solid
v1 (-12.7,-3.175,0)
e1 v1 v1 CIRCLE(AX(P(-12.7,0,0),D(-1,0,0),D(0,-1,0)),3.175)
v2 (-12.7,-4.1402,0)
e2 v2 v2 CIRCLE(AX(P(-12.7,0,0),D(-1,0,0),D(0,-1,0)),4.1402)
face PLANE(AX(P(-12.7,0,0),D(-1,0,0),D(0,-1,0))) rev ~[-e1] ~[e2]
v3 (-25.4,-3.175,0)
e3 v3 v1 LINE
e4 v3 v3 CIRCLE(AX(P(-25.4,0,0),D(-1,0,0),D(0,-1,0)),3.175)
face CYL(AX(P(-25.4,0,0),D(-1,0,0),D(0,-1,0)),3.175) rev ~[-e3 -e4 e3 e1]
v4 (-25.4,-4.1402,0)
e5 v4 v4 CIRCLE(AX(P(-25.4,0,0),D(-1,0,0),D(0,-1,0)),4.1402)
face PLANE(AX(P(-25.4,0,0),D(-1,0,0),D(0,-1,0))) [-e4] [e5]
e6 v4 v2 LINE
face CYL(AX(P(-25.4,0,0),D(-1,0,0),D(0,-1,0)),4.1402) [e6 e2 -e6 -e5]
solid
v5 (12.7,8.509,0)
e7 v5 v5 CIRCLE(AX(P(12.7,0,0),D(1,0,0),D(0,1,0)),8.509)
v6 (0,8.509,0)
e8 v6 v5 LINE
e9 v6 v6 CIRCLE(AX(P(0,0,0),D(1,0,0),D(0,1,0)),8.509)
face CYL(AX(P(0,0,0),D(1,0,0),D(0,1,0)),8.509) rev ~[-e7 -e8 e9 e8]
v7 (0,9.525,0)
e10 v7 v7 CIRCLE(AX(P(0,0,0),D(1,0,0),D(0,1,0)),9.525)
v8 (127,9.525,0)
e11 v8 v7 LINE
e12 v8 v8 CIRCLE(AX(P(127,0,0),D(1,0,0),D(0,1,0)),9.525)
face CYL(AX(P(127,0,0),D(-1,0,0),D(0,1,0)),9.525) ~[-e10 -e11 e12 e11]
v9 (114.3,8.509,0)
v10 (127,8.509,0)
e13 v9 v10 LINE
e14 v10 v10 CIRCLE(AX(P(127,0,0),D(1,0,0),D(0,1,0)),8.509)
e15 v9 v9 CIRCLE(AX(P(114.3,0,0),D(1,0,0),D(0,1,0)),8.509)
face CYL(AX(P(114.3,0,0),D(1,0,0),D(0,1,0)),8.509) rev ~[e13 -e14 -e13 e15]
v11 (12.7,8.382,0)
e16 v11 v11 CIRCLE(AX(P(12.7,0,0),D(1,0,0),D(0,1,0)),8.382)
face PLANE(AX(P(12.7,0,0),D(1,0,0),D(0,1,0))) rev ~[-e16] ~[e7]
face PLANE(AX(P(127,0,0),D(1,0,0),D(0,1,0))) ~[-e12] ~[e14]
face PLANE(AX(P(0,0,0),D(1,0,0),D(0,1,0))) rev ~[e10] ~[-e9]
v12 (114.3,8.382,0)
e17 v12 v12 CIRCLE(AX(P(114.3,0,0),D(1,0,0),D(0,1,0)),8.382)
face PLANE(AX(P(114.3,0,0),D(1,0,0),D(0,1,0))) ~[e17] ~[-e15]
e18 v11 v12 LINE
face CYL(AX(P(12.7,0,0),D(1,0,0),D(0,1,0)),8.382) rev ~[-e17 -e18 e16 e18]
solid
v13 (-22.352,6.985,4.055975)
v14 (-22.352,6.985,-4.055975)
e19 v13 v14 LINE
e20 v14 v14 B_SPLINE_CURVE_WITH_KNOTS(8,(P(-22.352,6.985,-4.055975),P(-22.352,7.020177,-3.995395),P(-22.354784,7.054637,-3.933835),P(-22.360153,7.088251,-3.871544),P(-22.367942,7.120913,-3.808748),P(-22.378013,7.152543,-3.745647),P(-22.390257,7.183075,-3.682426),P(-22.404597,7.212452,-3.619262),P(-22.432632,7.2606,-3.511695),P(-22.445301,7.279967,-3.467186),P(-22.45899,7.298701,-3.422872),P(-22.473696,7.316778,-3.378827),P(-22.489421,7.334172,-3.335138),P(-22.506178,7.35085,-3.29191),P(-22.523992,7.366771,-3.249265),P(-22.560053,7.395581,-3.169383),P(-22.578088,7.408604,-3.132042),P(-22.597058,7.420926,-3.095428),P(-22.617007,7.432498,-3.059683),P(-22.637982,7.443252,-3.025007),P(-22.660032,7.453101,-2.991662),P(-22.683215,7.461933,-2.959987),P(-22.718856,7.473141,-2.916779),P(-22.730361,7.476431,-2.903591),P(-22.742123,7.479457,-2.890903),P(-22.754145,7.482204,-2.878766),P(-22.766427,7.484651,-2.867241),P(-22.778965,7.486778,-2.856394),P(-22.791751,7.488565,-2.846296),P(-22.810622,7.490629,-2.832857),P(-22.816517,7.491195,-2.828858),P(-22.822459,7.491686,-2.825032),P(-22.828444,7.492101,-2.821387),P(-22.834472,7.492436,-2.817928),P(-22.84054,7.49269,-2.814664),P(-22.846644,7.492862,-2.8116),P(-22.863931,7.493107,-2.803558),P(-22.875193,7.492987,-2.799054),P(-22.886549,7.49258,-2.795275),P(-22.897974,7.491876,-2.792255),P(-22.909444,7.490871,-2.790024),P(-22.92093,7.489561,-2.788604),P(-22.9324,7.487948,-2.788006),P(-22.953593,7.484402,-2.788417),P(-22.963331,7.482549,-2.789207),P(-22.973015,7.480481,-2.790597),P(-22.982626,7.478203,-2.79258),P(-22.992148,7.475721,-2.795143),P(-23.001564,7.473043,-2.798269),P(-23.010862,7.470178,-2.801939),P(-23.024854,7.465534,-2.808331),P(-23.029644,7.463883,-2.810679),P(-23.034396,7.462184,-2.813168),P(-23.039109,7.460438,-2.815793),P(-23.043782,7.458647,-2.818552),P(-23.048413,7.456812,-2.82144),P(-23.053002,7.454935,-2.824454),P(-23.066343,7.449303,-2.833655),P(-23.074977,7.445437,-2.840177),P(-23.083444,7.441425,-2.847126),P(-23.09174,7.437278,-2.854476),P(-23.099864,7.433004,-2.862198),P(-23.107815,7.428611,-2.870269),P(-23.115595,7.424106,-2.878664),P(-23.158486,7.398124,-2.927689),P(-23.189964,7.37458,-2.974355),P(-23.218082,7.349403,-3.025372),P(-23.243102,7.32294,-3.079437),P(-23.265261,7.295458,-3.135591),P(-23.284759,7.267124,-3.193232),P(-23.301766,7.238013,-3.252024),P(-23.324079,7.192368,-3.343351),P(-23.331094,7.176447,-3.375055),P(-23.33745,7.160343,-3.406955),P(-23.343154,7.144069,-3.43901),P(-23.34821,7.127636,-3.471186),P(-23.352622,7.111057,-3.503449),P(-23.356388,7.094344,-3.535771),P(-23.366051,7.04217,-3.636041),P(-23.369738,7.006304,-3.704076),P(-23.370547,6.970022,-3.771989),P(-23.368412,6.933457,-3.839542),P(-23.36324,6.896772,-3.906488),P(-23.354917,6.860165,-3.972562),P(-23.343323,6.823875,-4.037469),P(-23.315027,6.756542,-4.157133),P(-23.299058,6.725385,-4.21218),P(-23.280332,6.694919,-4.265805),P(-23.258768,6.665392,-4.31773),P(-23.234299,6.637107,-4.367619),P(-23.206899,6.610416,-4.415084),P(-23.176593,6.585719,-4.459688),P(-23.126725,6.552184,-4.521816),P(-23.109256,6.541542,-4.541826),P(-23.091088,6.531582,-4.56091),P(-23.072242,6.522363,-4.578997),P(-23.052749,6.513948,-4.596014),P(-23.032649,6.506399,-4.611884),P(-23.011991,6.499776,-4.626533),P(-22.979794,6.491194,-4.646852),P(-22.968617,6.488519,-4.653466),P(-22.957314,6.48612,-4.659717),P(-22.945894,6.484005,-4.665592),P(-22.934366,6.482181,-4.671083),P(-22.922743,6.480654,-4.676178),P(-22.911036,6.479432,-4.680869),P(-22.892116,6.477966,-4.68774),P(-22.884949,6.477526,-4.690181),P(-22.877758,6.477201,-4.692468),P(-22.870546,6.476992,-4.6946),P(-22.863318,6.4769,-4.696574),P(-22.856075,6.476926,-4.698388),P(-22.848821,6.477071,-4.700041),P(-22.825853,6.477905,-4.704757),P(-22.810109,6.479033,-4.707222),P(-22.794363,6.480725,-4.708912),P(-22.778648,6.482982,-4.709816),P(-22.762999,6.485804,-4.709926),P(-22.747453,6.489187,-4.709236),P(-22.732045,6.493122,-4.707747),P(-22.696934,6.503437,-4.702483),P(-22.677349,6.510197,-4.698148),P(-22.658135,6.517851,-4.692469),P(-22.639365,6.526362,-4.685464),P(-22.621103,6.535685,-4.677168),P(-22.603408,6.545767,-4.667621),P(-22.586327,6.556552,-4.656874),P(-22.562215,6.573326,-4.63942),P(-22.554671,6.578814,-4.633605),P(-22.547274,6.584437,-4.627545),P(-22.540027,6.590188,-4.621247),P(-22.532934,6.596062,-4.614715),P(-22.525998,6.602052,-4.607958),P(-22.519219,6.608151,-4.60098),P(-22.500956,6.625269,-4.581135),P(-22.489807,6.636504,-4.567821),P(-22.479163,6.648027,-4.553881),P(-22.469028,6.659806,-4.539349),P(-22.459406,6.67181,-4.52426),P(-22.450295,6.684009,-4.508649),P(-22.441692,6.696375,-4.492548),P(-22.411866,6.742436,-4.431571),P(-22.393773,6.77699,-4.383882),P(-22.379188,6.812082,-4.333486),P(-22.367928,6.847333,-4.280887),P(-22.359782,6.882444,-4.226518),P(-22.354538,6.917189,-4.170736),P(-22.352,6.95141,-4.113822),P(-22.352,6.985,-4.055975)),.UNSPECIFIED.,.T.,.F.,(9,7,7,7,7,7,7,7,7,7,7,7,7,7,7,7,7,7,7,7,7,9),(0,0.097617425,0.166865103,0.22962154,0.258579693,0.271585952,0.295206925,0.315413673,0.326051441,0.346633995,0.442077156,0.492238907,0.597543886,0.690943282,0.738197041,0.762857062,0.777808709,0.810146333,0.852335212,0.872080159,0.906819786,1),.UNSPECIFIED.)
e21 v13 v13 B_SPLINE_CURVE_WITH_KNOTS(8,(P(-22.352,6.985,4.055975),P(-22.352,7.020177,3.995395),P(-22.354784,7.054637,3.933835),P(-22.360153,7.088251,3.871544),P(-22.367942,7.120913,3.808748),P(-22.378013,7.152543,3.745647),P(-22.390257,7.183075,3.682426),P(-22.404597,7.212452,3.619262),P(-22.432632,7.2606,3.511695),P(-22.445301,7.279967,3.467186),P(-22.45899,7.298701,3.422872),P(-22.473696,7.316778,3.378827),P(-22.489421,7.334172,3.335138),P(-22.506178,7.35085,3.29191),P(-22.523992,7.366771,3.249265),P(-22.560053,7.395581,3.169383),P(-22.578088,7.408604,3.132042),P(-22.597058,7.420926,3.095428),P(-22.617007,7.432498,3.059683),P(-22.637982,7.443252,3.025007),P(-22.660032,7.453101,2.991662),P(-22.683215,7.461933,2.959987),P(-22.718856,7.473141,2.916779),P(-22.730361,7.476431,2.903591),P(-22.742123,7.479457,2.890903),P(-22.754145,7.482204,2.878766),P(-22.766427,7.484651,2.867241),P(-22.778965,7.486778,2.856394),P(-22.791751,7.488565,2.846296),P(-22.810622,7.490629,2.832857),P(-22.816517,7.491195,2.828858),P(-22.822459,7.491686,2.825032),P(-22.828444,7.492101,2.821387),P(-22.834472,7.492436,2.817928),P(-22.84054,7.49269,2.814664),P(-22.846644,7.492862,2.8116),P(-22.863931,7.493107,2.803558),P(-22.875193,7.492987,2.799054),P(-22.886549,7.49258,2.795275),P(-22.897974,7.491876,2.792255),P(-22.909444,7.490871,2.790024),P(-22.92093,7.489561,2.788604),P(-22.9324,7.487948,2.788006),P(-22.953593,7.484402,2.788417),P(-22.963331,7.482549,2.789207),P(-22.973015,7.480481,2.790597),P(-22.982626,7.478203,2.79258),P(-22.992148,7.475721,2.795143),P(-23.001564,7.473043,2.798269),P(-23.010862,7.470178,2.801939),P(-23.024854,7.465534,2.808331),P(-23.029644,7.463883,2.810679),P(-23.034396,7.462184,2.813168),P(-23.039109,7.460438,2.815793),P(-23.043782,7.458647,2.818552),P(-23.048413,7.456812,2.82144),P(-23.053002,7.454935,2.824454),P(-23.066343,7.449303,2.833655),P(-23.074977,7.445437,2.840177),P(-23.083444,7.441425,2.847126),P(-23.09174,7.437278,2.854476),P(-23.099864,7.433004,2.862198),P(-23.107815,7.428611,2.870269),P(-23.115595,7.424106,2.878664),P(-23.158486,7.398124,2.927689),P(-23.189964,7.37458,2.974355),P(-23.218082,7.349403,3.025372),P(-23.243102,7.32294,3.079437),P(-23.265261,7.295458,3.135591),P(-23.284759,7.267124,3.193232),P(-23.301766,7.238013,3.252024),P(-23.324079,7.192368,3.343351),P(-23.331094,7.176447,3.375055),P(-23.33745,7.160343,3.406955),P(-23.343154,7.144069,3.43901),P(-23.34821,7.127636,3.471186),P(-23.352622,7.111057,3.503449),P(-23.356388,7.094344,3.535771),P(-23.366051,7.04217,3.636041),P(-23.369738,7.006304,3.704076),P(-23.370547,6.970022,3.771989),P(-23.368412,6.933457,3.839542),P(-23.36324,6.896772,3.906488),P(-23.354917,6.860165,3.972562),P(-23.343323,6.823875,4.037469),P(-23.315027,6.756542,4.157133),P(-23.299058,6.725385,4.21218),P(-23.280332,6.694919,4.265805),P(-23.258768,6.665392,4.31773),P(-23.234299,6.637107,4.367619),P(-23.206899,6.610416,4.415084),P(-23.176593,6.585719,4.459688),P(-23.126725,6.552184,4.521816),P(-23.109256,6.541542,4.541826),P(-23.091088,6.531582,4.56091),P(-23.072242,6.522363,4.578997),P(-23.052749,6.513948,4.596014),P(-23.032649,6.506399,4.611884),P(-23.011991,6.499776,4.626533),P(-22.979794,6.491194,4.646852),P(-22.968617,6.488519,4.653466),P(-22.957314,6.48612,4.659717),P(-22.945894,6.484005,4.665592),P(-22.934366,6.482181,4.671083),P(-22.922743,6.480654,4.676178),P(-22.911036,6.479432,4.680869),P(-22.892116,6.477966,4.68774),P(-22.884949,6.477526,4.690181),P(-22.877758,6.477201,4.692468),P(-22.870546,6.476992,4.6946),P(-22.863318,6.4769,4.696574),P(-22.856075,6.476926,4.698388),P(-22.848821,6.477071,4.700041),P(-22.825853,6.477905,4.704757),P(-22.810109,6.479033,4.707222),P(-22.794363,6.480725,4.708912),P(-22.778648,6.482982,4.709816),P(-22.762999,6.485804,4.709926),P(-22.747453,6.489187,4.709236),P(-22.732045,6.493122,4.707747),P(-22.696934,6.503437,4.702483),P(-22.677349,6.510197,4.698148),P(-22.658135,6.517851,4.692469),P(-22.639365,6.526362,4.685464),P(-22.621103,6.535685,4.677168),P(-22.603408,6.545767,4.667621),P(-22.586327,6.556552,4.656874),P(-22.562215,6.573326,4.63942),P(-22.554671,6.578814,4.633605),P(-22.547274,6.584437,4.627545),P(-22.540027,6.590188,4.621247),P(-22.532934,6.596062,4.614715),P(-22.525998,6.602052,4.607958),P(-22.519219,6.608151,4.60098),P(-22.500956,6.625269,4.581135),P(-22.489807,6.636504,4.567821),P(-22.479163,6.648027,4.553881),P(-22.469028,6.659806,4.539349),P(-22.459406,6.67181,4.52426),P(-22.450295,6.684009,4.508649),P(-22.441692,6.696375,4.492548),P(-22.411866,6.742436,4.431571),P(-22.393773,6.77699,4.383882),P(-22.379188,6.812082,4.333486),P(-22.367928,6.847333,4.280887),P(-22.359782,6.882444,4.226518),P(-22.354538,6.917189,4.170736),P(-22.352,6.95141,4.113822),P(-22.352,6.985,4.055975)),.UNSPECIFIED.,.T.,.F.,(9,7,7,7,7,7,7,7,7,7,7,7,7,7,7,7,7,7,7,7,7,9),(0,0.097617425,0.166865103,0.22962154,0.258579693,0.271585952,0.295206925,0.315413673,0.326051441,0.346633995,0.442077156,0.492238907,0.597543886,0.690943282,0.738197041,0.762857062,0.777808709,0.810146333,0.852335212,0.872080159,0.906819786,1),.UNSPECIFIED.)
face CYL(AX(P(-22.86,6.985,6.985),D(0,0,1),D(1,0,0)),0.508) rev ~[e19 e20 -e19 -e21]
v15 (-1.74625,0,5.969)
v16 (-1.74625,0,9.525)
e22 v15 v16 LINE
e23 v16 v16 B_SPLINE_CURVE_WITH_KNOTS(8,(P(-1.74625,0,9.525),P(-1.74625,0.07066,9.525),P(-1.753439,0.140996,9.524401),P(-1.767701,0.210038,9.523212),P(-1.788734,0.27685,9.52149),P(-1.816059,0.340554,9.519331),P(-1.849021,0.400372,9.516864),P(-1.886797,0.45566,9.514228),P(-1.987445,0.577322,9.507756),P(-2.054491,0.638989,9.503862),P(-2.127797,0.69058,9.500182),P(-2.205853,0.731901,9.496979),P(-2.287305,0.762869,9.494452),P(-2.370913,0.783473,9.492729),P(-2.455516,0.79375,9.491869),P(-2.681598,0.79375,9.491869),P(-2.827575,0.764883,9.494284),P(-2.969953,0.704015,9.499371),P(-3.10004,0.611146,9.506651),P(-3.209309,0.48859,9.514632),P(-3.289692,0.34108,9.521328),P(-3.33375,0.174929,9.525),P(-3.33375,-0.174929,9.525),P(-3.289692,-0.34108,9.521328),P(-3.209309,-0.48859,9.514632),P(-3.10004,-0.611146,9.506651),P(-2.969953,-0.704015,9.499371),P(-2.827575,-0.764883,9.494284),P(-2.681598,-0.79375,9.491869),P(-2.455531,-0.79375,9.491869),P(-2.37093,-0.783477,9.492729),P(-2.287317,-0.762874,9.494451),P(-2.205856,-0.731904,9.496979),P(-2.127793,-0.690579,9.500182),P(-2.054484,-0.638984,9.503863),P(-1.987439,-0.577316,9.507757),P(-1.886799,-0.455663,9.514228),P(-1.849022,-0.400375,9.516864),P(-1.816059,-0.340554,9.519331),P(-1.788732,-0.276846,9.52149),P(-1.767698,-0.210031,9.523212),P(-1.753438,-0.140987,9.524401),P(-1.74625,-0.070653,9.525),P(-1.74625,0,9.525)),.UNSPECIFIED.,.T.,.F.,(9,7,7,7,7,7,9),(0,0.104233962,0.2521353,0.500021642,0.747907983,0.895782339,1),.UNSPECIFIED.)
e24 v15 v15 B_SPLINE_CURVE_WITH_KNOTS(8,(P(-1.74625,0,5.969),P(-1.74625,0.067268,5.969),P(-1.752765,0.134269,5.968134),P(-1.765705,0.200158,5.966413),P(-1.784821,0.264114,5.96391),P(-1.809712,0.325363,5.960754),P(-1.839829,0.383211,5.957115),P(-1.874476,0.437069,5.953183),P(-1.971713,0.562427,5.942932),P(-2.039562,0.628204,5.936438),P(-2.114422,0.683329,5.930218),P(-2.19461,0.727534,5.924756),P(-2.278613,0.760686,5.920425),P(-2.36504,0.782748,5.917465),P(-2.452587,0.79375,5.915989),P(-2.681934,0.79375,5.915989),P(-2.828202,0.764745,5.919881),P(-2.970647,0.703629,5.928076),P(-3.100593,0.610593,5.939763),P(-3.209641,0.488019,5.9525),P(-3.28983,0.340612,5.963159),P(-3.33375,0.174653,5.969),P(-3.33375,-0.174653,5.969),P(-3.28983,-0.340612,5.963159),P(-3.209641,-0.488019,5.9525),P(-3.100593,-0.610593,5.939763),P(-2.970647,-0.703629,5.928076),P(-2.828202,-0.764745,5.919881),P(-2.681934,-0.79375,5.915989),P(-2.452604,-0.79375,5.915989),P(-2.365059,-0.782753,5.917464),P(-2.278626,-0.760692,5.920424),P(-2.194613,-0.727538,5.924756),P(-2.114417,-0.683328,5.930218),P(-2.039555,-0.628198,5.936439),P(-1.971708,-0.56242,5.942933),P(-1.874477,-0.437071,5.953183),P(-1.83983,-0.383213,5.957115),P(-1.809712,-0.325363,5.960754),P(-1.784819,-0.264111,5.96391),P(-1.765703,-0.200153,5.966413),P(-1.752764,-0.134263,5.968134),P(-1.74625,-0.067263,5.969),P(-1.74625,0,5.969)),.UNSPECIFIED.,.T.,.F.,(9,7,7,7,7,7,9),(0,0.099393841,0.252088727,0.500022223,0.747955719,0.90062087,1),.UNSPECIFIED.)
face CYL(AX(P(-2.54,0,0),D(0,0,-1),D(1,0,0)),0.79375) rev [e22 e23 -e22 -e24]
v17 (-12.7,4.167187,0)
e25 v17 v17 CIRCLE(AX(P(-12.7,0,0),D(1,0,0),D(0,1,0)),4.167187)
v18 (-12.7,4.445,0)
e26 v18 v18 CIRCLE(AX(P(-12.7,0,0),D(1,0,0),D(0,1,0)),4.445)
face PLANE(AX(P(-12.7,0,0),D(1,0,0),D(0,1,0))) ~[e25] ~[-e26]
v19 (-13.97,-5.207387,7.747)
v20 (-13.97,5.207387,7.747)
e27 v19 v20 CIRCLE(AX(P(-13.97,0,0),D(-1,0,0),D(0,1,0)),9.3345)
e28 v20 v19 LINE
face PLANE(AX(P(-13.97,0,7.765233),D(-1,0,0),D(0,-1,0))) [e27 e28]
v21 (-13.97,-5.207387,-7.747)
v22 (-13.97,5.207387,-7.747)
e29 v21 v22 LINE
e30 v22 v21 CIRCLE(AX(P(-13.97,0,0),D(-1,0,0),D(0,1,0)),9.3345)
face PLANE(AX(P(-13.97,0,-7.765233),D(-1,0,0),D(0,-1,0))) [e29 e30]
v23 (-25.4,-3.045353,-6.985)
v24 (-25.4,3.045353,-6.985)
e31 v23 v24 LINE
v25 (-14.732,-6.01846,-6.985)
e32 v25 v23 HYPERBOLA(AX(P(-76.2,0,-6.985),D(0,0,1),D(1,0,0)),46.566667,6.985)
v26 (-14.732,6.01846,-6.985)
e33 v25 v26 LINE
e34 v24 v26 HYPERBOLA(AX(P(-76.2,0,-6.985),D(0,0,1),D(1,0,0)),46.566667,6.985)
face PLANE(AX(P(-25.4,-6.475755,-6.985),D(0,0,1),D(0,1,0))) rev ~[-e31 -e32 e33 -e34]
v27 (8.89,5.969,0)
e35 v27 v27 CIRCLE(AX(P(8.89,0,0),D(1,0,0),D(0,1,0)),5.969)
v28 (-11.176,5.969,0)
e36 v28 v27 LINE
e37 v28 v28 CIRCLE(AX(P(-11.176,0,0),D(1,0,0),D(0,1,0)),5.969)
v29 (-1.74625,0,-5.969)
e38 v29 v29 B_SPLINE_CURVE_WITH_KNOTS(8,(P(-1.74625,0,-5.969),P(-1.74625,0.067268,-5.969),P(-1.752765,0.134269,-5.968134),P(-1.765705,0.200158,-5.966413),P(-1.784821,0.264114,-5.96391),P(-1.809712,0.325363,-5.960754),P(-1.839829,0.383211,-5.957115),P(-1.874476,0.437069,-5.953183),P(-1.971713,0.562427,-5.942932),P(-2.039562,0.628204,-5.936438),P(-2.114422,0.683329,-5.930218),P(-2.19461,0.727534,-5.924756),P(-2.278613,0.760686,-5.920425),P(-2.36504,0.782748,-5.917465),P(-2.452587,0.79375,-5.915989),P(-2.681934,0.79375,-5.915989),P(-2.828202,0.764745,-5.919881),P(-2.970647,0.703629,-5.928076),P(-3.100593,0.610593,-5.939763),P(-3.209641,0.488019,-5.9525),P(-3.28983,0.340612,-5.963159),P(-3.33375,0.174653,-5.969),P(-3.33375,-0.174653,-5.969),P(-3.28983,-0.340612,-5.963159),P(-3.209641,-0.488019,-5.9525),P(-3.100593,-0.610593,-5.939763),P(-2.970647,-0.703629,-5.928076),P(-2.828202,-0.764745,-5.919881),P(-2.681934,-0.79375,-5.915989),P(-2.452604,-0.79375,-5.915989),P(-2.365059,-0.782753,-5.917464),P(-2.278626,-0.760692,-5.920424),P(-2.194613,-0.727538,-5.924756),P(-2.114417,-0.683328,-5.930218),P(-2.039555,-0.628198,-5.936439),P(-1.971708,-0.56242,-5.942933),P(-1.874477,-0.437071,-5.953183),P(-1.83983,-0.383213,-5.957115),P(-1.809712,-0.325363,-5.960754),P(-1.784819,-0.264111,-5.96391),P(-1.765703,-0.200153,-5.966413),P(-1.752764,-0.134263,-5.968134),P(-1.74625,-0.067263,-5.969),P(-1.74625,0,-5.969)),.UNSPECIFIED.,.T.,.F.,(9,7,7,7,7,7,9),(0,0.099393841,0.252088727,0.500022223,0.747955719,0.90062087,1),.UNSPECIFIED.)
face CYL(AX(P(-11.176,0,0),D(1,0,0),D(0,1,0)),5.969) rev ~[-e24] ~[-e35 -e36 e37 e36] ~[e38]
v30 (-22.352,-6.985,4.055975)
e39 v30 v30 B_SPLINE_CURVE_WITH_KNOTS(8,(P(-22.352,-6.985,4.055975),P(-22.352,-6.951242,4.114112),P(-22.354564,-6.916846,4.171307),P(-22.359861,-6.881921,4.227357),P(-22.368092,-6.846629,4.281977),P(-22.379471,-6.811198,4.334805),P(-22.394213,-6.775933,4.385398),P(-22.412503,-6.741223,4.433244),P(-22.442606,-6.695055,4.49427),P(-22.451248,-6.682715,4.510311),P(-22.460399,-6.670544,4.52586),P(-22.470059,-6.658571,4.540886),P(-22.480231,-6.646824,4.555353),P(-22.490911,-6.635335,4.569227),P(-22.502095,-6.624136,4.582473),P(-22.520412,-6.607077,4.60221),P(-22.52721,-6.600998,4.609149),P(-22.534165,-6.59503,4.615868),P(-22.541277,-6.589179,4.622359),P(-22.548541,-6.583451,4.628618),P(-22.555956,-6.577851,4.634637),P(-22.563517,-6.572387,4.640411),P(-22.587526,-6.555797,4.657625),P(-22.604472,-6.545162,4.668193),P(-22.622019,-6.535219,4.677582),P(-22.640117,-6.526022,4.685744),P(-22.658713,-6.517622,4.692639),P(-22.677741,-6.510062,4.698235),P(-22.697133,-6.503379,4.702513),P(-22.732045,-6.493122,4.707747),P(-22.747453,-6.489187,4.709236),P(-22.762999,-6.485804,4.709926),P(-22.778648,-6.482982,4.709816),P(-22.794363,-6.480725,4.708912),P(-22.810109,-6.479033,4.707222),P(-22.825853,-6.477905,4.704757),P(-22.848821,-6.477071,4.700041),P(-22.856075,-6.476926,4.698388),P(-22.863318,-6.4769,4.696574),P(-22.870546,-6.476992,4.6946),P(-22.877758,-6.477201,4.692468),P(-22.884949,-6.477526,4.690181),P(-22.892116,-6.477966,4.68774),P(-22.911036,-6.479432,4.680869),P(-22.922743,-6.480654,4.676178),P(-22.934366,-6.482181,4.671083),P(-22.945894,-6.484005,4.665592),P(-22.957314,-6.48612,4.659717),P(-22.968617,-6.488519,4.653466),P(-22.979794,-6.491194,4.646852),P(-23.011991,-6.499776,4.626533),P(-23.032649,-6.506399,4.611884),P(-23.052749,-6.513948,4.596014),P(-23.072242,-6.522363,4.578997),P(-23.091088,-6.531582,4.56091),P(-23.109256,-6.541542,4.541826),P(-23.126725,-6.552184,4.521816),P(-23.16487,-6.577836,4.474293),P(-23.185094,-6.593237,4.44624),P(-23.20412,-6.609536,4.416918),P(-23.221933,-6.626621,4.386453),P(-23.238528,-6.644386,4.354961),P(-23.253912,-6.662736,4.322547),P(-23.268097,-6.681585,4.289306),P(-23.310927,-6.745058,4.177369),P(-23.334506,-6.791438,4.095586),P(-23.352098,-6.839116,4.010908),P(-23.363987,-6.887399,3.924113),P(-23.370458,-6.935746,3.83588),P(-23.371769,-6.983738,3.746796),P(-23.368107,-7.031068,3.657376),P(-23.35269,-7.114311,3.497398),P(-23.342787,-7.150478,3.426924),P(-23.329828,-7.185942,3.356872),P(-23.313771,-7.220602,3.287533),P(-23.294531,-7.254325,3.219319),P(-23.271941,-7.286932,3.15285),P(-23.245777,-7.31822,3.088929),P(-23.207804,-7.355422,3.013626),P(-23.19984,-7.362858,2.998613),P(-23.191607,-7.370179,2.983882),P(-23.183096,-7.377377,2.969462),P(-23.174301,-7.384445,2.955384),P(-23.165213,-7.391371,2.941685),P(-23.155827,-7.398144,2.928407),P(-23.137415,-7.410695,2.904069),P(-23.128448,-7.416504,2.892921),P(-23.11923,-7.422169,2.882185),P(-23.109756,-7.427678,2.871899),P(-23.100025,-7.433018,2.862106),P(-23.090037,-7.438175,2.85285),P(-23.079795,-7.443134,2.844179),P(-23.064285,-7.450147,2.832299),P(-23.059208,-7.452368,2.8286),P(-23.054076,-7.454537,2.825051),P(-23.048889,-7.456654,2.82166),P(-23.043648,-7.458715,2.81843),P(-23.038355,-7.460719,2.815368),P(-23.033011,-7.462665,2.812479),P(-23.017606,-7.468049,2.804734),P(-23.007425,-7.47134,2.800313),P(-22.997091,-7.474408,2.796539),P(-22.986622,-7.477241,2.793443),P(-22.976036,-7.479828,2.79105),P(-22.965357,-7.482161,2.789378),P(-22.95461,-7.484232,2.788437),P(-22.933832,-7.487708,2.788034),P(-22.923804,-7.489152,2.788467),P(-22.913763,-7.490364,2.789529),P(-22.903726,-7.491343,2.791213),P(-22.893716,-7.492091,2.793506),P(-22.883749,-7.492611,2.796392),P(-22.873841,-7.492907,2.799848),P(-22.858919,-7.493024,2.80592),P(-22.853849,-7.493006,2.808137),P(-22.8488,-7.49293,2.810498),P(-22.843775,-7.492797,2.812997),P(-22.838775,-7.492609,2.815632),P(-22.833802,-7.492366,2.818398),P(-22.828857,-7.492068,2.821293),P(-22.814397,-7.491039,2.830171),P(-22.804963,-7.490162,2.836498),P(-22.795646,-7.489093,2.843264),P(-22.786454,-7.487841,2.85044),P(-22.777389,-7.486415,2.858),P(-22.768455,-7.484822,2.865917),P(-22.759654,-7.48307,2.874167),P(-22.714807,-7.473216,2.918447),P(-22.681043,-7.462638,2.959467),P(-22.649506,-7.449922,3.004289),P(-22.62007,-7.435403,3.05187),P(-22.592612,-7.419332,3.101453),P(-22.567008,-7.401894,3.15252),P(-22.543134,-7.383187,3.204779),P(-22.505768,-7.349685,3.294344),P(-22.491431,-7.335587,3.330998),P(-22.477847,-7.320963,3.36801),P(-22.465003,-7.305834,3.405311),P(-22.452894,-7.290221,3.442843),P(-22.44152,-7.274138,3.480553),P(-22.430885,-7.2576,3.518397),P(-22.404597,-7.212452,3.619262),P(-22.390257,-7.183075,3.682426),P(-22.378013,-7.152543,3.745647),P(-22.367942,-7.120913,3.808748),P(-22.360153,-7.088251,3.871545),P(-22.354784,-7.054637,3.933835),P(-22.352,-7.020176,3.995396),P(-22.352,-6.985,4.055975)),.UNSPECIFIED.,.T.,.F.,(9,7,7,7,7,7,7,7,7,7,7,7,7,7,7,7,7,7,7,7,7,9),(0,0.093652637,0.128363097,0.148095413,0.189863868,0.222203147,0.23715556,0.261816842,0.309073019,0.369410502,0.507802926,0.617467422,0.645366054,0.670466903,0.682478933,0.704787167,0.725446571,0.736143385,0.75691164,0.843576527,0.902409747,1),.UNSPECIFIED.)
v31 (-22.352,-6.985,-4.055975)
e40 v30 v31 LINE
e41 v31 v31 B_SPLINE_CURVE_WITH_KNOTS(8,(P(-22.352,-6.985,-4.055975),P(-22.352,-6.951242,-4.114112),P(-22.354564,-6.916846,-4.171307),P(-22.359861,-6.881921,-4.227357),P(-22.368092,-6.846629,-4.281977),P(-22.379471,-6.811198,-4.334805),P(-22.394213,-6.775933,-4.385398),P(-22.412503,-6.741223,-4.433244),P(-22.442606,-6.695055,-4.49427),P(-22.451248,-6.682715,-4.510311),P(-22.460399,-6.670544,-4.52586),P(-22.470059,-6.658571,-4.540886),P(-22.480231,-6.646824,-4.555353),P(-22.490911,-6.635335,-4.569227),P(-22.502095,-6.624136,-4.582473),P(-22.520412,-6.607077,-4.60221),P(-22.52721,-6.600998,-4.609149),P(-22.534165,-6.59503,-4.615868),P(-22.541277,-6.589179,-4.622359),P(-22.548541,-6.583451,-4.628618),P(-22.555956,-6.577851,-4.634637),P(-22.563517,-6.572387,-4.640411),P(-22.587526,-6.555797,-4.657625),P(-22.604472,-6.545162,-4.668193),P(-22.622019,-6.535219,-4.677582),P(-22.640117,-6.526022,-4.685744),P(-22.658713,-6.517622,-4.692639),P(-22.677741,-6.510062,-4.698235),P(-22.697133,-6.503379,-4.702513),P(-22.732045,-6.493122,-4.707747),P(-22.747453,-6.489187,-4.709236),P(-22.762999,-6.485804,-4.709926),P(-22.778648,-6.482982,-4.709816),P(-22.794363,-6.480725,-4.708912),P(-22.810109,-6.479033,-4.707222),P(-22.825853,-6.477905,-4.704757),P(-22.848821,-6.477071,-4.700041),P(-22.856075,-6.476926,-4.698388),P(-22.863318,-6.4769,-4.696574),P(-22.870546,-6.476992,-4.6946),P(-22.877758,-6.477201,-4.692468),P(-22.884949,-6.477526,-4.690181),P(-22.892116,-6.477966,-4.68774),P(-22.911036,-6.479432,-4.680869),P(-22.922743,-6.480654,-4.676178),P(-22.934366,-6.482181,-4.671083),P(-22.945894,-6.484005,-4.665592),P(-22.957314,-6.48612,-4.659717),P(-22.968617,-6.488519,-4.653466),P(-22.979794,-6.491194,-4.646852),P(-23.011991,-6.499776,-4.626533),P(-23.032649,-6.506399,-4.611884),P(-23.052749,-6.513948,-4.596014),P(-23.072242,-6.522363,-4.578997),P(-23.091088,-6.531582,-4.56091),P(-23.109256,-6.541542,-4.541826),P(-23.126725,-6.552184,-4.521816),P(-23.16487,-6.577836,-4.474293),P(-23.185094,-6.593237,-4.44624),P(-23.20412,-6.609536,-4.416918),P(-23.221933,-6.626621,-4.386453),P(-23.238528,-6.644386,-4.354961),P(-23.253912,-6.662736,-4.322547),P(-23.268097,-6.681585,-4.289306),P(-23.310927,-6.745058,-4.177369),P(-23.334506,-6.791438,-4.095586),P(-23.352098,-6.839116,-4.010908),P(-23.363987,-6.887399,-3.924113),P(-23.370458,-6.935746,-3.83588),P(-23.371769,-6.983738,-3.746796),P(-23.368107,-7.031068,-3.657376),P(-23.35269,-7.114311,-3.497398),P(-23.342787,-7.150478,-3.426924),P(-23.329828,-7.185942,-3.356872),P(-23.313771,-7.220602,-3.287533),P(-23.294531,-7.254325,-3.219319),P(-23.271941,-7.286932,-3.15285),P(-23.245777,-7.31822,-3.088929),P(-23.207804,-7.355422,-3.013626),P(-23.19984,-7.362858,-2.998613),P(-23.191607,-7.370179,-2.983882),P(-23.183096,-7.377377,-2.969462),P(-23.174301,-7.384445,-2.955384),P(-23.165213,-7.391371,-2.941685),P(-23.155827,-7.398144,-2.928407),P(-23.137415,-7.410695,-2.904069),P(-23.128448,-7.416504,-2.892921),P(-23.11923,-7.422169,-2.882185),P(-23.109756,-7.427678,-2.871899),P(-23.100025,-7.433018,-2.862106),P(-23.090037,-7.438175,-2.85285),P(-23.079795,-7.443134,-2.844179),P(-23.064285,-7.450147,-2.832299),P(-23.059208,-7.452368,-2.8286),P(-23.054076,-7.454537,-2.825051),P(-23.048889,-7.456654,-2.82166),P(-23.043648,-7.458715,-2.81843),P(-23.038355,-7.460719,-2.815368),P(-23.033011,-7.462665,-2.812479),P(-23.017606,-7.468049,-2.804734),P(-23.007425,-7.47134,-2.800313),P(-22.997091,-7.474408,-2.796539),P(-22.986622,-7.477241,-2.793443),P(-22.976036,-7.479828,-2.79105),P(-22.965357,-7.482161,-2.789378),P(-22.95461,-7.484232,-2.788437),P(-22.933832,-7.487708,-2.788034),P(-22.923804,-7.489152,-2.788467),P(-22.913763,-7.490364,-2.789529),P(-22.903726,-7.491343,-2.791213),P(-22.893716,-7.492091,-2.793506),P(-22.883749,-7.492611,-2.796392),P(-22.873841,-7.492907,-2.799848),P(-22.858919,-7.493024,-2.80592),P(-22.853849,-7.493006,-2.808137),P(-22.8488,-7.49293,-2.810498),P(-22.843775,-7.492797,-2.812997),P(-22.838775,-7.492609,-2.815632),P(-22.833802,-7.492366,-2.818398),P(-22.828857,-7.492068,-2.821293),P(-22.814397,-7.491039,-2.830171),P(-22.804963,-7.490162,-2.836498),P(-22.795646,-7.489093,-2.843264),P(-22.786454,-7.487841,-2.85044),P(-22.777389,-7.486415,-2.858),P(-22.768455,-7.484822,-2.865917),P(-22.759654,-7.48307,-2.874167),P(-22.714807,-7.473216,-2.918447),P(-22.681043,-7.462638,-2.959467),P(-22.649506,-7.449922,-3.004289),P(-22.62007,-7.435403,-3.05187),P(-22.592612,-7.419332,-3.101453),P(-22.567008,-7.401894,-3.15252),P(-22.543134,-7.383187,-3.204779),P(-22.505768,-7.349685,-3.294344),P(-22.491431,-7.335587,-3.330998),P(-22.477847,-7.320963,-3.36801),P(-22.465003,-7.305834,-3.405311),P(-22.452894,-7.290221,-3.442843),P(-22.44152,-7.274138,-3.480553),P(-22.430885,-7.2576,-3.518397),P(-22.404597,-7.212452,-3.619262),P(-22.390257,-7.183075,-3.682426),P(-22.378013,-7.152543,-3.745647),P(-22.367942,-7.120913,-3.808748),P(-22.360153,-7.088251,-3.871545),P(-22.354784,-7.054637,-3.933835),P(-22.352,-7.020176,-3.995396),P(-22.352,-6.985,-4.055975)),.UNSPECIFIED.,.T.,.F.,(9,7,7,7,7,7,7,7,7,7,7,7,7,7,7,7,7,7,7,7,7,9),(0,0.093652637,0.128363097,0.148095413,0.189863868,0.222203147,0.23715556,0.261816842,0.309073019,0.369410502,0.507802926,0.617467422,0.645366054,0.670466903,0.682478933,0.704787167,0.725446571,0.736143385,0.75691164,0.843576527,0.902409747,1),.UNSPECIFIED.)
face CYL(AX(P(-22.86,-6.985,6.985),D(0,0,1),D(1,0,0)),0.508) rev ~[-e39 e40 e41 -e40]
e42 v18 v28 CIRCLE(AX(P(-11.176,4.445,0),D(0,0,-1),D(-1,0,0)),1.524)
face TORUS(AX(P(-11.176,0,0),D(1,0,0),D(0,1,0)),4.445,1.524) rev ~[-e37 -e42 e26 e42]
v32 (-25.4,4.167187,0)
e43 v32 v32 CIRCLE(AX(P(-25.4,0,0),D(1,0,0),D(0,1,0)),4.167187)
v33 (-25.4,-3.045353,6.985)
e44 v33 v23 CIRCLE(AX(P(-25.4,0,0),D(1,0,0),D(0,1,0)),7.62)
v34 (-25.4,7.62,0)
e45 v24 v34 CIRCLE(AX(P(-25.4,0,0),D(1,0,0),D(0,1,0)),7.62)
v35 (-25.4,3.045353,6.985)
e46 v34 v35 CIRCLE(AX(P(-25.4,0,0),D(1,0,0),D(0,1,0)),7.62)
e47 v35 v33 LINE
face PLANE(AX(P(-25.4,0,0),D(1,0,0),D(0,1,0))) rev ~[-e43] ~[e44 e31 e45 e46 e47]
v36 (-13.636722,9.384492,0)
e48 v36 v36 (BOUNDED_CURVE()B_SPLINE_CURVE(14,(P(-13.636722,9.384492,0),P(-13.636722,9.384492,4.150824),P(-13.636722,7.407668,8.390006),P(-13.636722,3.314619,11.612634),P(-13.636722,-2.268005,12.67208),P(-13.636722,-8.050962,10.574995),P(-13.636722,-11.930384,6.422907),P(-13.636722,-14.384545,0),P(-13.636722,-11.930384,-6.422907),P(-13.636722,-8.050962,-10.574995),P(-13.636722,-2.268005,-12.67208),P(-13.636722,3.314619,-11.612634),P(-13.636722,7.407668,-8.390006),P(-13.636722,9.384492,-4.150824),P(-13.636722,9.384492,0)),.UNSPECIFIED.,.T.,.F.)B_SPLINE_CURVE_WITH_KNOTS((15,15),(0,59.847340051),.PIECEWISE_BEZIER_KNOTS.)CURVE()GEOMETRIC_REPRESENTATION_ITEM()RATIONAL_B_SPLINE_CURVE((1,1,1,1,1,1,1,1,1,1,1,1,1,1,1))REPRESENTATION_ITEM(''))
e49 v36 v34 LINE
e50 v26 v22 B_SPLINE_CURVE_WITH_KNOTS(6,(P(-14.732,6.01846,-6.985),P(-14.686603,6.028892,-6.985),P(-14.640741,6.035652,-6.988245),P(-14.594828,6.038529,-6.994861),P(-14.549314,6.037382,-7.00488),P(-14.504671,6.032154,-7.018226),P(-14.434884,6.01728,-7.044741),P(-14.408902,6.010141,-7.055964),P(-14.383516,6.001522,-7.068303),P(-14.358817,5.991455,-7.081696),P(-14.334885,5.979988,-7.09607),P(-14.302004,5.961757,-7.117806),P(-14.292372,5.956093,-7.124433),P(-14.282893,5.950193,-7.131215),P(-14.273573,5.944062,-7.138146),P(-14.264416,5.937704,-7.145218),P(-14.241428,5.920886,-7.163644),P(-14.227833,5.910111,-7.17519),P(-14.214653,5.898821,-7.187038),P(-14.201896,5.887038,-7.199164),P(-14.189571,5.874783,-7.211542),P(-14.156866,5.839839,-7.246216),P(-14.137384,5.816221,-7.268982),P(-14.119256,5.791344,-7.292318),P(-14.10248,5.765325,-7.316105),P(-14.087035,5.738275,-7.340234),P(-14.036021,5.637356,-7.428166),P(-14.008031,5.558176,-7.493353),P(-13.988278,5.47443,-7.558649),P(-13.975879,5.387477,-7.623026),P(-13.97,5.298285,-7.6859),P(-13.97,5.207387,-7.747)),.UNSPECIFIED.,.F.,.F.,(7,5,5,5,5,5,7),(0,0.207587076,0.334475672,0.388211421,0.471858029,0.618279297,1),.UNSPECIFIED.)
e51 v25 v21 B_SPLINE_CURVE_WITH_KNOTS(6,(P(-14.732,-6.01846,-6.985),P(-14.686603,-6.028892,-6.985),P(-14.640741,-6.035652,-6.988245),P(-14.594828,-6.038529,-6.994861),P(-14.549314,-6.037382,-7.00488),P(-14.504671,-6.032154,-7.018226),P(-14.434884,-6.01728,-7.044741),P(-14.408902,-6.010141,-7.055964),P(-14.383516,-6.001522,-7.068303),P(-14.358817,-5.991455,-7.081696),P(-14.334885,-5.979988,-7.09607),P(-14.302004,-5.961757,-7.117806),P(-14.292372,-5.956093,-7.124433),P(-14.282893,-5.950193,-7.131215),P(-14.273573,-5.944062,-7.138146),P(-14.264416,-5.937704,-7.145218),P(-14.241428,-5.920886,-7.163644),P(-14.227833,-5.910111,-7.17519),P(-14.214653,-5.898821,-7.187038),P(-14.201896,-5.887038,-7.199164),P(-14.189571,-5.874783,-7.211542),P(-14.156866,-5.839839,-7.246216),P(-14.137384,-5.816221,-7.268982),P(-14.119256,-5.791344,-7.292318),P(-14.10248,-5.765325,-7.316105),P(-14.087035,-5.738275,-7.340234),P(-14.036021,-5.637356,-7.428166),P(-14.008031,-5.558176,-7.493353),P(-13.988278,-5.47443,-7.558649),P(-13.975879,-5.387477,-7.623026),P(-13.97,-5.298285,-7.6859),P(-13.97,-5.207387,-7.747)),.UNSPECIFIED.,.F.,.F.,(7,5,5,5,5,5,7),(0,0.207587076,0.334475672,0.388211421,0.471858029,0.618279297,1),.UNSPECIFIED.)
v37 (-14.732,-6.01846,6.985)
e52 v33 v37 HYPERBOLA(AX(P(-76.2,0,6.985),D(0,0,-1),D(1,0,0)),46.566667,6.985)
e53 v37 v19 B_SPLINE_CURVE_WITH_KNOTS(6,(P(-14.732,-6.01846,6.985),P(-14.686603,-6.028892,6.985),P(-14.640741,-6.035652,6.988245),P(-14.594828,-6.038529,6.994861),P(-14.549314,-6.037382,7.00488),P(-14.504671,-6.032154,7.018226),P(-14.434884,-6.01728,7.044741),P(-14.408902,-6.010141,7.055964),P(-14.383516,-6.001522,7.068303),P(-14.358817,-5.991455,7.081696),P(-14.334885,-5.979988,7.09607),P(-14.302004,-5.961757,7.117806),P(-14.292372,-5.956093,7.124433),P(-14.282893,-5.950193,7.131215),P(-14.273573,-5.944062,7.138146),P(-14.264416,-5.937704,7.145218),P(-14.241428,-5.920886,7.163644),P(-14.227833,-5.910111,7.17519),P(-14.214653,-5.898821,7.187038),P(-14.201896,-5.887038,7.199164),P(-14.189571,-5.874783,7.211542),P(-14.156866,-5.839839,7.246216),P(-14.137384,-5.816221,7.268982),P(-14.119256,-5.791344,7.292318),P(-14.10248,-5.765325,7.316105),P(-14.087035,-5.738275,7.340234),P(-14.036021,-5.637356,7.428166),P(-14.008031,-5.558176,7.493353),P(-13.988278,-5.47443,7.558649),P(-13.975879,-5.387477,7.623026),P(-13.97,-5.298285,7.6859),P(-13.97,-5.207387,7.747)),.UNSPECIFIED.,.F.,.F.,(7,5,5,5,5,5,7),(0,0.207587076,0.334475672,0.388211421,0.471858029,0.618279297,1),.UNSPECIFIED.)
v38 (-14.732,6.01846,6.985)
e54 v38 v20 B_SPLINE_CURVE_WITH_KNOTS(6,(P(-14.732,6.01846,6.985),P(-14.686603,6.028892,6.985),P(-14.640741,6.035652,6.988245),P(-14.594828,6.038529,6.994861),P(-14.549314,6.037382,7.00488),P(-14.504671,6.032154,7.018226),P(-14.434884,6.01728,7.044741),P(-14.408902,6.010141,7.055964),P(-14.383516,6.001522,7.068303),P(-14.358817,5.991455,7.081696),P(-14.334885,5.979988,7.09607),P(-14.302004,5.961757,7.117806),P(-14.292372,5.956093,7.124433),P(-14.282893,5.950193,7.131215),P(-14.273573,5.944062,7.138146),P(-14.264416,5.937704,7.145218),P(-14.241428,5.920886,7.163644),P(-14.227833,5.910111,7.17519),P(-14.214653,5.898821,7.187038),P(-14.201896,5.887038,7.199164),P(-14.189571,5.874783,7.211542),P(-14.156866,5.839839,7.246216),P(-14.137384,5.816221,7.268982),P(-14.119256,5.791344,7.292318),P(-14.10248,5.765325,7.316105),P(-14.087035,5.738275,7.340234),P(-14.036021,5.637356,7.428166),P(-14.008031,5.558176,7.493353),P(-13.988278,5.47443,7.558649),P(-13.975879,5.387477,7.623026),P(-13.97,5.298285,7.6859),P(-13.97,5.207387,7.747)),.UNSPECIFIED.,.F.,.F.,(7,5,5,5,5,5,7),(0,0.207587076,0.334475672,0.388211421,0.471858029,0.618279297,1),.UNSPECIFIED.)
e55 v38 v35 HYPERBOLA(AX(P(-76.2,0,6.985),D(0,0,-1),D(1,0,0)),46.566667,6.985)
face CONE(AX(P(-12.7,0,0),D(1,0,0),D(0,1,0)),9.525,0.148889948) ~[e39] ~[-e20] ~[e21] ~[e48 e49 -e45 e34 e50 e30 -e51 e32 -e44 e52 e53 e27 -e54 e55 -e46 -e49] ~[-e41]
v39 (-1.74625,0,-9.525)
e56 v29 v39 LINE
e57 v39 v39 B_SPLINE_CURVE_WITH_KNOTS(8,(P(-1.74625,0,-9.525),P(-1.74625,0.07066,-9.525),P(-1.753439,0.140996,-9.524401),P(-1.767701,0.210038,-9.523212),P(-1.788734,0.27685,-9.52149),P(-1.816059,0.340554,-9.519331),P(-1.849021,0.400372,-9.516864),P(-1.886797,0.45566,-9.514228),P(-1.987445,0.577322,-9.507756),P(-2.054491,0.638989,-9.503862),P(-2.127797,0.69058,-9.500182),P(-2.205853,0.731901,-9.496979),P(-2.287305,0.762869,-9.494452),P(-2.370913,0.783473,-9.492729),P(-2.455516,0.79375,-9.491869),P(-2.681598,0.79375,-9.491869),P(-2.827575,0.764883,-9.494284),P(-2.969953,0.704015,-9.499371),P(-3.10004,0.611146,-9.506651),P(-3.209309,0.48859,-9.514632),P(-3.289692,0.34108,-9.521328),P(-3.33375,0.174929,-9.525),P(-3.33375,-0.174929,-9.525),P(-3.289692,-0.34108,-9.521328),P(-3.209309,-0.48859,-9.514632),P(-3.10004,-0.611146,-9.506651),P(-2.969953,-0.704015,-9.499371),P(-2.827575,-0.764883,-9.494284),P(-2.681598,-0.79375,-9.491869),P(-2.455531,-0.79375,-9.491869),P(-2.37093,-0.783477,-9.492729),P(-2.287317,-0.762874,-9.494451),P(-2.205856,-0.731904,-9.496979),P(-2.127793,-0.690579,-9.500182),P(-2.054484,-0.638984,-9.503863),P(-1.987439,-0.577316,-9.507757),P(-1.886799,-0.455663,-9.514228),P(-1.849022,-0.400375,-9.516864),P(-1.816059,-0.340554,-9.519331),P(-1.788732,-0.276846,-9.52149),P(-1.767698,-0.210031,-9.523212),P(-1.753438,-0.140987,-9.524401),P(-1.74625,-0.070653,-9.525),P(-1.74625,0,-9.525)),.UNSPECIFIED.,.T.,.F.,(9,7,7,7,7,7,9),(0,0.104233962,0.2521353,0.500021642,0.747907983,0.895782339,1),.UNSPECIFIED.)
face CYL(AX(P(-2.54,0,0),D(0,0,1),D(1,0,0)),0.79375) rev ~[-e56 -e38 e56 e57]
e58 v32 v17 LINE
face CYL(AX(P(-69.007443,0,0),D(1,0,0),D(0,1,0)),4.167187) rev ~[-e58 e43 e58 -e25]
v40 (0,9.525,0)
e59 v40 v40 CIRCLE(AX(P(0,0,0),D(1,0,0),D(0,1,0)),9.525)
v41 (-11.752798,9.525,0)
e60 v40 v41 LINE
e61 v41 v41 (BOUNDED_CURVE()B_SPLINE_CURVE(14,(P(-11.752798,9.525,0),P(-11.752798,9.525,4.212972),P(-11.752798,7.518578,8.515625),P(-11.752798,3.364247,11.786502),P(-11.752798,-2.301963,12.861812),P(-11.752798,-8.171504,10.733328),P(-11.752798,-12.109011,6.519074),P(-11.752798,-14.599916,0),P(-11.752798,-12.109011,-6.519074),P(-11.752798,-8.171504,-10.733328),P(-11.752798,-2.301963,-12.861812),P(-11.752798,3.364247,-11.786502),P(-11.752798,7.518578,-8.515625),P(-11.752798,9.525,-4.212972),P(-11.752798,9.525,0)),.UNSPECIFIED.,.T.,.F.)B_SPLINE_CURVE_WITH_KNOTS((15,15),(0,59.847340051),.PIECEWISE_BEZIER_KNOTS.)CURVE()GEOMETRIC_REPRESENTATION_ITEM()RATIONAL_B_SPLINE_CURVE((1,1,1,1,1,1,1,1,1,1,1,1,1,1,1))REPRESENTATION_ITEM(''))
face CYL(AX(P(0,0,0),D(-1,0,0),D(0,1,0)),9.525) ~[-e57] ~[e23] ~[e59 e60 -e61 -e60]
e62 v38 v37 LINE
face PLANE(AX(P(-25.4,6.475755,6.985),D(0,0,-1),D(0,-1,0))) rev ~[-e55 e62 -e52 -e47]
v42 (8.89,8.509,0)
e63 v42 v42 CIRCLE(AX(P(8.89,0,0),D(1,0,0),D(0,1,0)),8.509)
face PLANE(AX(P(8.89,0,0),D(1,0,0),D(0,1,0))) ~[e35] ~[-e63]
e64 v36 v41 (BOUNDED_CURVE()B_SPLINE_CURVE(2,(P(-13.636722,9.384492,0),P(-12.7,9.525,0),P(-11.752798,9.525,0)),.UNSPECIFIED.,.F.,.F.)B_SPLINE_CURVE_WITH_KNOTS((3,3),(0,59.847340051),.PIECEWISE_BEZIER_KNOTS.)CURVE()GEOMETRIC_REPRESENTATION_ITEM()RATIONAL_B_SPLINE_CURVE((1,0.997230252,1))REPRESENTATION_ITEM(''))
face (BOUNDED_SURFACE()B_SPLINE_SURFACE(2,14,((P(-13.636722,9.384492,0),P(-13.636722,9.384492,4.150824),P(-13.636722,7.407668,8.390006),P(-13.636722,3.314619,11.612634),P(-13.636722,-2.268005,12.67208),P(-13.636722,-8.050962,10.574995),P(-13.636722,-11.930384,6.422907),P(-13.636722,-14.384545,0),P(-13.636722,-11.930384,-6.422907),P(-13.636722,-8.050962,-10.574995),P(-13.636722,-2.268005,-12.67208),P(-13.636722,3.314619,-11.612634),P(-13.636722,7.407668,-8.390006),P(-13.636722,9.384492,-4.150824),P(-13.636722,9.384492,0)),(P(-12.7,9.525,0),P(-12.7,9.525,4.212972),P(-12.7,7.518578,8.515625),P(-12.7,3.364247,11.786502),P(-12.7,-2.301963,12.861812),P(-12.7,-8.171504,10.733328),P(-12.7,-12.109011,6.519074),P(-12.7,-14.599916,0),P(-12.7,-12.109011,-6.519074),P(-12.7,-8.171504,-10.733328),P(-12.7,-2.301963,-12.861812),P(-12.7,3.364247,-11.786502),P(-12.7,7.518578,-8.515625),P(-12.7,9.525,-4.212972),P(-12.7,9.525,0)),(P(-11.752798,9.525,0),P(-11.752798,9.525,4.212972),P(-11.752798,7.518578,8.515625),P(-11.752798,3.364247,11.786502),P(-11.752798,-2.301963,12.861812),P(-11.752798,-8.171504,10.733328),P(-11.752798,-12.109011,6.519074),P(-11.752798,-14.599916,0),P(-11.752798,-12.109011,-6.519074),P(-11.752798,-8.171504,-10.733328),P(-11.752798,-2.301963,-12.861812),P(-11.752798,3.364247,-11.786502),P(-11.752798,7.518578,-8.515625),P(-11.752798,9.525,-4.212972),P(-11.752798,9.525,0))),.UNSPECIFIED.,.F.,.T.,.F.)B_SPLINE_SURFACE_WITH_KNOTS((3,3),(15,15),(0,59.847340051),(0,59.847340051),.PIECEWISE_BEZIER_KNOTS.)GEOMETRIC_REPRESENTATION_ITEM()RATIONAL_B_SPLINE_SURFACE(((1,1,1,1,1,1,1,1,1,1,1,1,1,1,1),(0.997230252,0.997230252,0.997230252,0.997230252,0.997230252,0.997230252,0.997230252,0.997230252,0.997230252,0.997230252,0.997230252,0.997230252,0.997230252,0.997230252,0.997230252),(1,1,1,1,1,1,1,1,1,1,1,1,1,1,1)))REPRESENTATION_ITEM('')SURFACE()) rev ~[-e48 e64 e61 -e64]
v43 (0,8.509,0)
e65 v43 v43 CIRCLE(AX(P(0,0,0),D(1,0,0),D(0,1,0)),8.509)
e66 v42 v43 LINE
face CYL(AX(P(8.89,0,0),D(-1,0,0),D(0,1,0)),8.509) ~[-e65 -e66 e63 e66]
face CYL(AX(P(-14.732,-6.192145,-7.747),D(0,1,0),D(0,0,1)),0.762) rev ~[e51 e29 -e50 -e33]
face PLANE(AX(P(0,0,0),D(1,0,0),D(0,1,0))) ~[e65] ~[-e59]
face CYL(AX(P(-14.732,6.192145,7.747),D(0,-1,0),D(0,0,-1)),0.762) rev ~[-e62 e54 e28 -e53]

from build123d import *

# Parameters (mm, degrees)
F6_D          = 8.334375
F7_R          = 0.79375
F8_DEPTH      = 9.526
F8_DEPTH_BACK = 9.526
F9_R          = 12.7
F10_R         = 4.1402
F10_R_2       = 3.175
F11_DEPTH     = 12.7
F13_DEPTH     = 11.43
F14_R         = 0.762
F15_R         = 0.508
F16_DEPTH     = 16.5110001


# Not quite as in the source:
# - a length typed as a fraction of an inch, garbled in the dataset ("3 / 203.2 mm" for 3/8 in), is restored


with BuildPart() as f2:
    # F0 (on Top) → F2 (revolve)
    with BuildSketch(Plane.XY):
        Polygon((127, 9.525), (0, 9.525), (0, 8.509), (12.7, 8.509), (12.7, 8.382), (114.3, 8.382), (114.3, 8.509), (127, 8.509), align=None)
    revolve(axis=Axis((12.7, 0, 0), (1, 0, 0)))


with BuildPart() as f4:
    # F3 (on Top) → F4 (revolve)
    with BuildSketch(Plane.XY):
        with BuildLine():
            Line((-25.4, 7.62), (-25.4, 0))
            Line((-25.4, 0), (-12.7, 0))
            Line((-12.7, 0), (-12.7, 4.445))
            ThreePointArc((-12.7, 4.445), (-12.2536307345, 5.5226307345), (-11.176, 5.969))
            Line((-11.176, 5.969), (8.89, 5.969))
            Line((8.89, 5.969), (8.89, 8.509))
            Line((8.89, 8.509), (0, 8.509))
            Line((0, 8.509), (0, 9.525))
            Line((0, 9.525), (-12.7, 9.525))
            Line((-12.7, 9.525), (-25.4, 7.62))
        make_face()
    revolve(axis=Axis((12.7, 0, 0), (1, 0, 0)))

    # F6 (through all)
    with Locations(Plane(origin=(-25.4, 0, 0), x_dir=(0, -1, 0), z_dir=(-1, 0, 0))):
        with Locations((0, 0)):
            Hole(F6_D / 2)

    # F7 (on Top) → F8 (cut, two sides)
    with BuildSketch(Plane.XY) as f8_sk:
        with Locations((-2.54, 0)):
            Circle(F7_R)
    extrude(amount=-F8_DEPTH, mode=Mode.SUBTRACT)
    extrude(f8_sk.sketch, amount=F8_DEPTH_BACK, mode=Mode.SUBTRACT)

    # F9
    f9_edges = [f4.edges().sort_by_distance(p)[0] for p in [
        (-12.7, -9.525, 0),
    ]]
    fillet(f9_edges, radius=F9_R)

    # F12 (on face) → F13 (cut)
    with BuildSketch(Plane(origin=(-25.4, 0, 0), x_dir=(0, -1, 0), z_dir=(-1, 0, 0))):
        with BuildLine():
            ThreePointArc((6.4757547823, 6.985), (0, 9.525), (-6.4757547823, 6.985))
            Line((-6.4757547823, 6.985), (6.4757547823, 6.985))
        make_face()
        with BuildLine():
            Line((6.4757547823, -6.985), (-6.4757547823, -6.985))
            ThreePointArc((-6.4757547823, -6.985), (0, -9.525), (6.4757547823, -6.985))
        make_face()
    extrude(amount=-F13_DEPTH, mode=Mode.SUBTRACT)

    # F14
    f14_edges = [f4.edges().sort_by_distance(p)[0] for p in [
        (-13.97, 0, 6.985),
        (-13.97, 0, -6.985),
    ]]
    fillet(f14_edges, radius=F14_R)

    # F15 (on face) → F16 (cut, through all)
    with BuildSketch(Plane.XY.offset(6.985)):
        with Locations((-22.86, 6.985)):
            Circle(F15_R)
        with Locations((-22.86, -6.985)):
            Circle(F15_R)
    extrude(amount=-F16_DEPTH, mode=Mode.SUBTRACT)


with BuildPart() as f11:
    # F10 (on face) → F11 (new body)
    with BuildSketch(Plane(origin=(-25.4, 0, 0), x_dir=(0, -1, 0), z_dir=(-1, 0, 0))):
        Circle(F10_R)
        Circle(F10_R_2, mode=Mode.SUBTRACT)
    extrude(amount=-F11_DEPTH)


solid = Compound([f2.part, f4.part, f11.part])
